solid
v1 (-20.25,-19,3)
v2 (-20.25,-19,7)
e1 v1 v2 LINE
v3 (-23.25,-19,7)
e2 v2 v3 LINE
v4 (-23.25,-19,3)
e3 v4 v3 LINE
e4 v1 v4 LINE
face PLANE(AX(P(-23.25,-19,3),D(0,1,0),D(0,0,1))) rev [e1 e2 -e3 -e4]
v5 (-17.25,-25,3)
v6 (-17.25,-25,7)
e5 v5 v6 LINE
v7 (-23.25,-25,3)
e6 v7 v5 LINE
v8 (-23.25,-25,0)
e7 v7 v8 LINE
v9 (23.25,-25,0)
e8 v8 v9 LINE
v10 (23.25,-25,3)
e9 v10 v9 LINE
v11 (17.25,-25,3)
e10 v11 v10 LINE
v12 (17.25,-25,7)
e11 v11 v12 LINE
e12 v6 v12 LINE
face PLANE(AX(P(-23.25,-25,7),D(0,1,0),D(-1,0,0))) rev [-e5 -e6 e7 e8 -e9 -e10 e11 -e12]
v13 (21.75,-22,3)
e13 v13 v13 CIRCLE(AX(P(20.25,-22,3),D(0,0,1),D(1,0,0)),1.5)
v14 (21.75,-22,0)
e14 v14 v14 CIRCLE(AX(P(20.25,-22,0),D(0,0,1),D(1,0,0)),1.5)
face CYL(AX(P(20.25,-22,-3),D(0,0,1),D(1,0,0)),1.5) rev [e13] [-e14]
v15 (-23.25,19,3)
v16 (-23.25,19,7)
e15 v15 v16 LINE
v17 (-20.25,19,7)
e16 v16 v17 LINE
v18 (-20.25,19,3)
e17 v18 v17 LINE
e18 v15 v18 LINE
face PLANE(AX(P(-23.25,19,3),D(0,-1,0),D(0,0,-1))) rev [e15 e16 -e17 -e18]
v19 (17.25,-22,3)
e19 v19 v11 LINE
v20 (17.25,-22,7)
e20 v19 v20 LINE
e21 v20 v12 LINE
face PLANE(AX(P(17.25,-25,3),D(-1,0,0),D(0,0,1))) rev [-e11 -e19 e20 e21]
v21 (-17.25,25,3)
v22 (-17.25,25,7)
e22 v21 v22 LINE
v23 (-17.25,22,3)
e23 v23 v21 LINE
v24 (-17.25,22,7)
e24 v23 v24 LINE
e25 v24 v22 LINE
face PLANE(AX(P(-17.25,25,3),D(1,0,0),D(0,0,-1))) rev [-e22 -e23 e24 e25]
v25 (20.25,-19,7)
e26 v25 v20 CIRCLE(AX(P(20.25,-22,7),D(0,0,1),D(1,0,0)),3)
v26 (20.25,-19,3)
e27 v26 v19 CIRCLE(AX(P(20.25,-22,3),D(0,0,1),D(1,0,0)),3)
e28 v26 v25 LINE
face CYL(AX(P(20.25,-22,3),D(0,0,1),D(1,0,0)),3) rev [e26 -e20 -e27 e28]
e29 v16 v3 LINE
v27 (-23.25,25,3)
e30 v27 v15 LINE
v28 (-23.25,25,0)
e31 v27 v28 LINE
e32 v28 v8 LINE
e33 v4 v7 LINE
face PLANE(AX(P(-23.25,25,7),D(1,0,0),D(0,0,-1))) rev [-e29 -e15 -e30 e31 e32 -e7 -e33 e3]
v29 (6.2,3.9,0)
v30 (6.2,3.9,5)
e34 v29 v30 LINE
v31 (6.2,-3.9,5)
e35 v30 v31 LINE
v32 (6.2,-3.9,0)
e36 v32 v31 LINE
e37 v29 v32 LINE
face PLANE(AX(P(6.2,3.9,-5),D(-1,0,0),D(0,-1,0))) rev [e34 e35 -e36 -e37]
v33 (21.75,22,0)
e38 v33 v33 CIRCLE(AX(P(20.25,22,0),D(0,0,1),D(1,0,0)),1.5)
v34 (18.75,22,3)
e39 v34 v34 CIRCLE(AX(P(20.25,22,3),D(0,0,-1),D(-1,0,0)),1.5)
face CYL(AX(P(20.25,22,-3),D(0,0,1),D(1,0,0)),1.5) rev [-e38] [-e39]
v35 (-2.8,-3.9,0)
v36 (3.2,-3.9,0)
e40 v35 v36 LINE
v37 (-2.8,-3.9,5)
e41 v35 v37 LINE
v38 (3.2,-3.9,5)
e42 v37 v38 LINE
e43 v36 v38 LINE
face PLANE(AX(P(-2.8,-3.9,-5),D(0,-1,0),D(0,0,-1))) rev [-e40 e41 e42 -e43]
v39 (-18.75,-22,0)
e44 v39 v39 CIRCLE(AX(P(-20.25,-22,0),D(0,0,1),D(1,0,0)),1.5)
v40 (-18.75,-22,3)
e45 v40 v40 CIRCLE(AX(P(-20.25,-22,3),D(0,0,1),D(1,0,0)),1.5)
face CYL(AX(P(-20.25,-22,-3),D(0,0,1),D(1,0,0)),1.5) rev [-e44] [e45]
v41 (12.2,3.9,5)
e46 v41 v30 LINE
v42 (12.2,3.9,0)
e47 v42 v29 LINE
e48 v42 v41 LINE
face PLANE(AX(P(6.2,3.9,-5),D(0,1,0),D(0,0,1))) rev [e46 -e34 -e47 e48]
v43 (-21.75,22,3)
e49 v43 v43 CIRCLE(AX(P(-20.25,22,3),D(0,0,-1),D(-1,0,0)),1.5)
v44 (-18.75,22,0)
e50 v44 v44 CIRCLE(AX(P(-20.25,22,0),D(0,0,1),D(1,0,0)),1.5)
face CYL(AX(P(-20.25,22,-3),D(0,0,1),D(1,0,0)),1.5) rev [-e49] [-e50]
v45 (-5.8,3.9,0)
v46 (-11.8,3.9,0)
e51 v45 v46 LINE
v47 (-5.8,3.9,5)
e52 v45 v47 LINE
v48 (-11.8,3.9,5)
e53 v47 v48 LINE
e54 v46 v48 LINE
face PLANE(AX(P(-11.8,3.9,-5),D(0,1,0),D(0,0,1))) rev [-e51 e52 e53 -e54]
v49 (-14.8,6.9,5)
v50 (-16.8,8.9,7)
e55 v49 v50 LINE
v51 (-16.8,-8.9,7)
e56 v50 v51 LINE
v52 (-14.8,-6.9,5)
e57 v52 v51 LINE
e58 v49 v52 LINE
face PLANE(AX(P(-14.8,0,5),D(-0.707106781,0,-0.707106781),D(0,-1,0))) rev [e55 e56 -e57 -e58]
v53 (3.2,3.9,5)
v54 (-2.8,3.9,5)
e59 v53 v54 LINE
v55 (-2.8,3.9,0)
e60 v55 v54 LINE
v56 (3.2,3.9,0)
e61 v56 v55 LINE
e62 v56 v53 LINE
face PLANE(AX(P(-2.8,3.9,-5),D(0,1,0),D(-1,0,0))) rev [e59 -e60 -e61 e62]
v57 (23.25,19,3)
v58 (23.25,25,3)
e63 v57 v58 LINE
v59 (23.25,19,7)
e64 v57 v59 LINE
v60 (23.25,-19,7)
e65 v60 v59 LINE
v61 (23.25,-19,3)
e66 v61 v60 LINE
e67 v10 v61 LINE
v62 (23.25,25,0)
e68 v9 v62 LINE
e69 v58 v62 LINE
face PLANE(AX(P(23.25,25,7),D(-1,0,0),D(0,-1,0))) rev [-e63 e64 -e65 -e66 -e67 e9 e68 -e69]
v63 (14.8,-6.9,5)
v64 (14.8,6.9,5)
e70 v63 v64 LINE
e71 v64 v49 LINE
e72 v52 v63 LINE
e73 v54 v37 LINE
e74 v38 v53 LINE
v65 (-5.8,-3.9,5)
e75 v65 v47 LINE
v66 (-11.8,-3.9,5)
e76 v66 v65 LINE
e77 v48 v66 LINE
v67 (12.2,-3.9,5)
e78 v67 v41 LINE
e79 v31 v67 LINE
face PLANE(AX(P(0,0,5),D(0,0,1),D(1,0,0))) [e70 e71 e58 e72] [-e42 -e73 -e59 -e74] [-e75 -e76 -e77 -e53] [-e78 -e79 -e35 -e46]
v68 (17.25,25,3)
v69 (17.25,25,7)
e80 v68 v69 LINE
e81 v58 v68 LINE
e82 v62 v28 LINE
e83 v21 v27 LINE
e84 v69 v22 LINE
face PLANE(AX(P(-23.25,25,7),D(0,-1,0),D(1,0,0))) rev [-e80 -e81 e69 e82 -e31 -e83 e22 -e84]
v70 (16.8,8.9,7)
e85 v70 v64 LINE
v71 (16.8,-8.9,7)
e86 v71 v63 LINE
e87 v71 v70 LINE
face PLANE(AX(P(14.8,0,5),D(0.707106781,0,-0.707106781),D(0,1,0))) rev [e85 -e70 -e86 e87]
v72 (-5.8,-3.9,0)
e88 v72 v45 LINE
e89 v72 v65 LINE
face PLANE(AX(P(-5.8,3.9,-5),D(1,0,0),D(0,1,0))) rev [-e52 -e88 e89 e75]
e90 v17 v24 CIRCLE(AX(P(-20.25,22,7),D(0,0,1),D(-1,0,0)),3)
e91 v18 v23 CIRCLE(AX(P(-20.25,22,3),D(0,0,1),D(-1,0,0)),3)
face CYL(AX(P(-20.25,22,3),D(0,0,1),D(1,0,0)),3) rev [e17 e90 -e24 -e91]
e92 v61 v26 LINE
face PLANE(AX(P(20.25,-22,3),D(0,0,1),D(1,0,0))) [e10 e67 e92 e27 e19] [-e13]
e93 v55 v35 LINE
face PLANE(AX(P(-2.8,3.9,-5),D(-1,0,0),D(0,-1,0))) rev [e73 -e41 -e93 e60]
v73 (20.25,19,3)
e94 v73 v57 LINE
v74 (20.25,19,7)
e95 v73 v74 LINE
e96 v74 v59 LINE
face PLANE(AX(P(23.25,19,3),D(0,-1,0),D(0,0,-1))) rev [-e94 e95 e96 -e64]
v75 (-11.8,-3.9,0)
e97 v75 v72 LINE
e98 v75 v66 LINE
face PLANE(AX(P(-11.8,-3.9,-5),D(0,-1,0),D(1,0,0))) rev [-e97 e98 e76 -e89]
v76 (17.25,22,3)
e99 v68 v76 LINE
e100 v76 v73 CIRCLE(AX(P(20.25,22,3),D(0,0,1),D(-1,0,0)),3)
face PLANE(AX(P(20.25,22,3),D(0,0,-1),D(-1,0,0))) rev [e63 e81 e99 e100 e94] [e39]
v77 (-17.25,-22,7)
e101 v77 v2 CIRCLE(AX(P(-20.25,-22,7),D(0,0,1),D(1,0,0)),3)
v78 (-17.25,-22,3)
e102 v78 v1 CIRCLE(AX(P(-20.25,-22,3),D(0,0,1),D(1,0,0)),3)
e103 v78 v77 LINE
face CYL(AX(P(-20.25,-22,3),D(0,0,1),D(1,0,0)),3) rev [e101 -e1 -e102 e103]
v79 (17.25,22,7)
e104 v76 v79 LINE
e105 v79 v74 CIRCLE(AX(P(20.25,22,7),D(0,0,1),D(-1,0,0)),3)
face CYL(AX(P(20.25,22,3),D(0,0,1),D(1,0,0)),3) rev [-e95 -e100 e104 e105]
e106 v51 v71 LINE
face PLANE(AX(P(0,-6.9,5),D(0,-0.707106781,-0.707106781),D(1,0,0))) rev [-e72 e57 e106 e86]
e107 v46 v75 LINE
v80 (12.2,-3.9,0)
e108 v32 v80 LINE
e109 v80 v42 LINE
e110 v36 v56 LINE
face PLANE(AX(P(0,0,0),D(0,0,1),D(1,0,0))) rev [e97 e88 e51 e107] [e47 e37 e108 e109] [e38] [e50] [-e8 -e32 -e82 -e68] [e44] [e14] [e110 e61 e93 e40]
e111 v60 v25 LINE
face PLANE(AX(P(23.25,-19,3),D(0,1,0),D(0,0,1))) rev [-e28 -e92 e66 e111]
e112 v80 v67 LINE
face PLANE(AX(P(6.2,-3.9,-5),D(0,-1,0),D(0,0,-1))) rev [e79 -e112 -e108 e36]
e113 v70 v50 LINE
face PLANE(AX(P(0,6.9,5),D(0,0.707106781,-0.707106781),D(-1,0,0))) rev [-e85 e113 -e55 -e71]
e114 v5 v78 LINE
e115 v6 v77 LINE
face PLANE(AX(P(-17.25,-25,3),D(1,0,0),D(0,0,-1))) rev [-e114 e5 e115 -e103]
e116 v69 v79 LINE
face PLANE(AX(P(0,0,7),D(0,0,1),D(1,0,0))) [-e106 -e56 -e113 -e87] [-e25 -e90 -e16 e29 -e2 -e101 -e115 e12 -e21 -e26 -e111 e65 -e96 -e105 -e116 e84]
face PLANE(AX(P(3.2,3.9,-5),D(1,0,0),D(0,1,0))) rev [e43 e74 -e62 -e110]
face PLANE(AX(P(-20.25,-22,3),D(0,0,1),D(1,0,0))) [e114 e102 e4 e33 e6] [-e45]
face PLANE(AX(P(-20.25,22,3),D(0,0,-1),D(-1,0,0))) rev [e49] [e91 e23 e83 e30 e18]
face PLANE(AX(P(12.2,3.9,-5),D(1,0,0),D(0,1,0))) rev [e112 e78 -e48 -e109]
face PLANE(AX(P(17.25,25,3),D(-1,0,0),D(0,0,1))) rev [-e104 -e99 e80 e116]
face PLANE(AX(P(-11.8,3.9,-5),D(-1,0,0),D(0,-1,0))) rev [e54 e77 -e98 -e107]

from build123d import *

# Parameters (mm, degrees)
SKETCH1_W           = 46.5
SKETCH1_H           = 50
BOSS_EXTRUDE1_DEPTH = 7
SKETCH2_W           = 33.6
SKETCH2_H           = 17.8
CUT_EXTRUDE1_DEPTH  = 2
CHAMFER1_SIZE       = 2
CUT_EXTRUDE2_DEPTH  = 4
SKETCH4_R           = 1.5
CUT_EXTRUDE3_DEPTH  = 10
SKETCH5_W           = 6
SKETCH5_H           = 7.8
CUT_EXTRUDE4_DEPTH  = 10


with BuildPart() as part:
    # Sketch1 → Boss-Extrude1 (new body)
    with BuildSketch(Plane.XY):
        Rectangle(SKETCH1_W, SKETCH1_H)
    extrude(amount=BOSS_EXTRUDE1_DEPTH)

    # Sketch2 → Cut-Extrude1 (cut)
    with BuildSketch(Plane.XY.offset(7)):
        Rectangle(SKETCH2_W, SKETCH2_H)
    extrude(amount=-CUT_EXTRUDE1_DEPTH, mode=Mode.SUBTRACT)

    # Chamfer1
    chamfer1_edges = [part.edges().sort_by_distance(p)[0] for p in [
        (0, -8.9, 5),
        (16.8, 0, 5),
        (0, 8.9, 5),
        (-16.8, 0, 5),
    ]]
    chamfer(chamfer1_edges, length=CHAMFER1_SIZE - 0.0001)  # a hair under: the kernel refuses the full size

    # Sketch3 → Cut-Extrude2 (cut)
    with BuildSketch(Plane.XY.offset(7)):
        with BuildLine():
            Line((23.25, -25), (17.25, -25))
            Line((17.25, -25), (17.25, -22))
            ThreePointArc((17.25, -22), (18.128679656, -19.878679656), (20.25, -19))
            Line((20.25, -19), (23.25, -19))
            Line((23.25, -19), (23.25, -25))
        make_face()
        with BuildLine():
            Line((-23.25, -25), (-17.25, -25))
            Line((-17.25, -25), (-17.25, -22))
            ThreePointArc((-17.25, -22), (-18.128679656, -19.878679656), (-20.25, -19))
            Line((-20.25, -19), (-23.25, -19))
            Line((-23.25, -19), (-23.25, -25))
        make_face()
        with BuildLine():
            Line((-17.25, 25), (-17.25, 22))
            ThreePointArc((-17.25, 22), (-18.128679656, 19.878679656), (-20.25, 19))
            Line((-20.25, 19), (-23.25, 19))
            Line((-23.25, 19), (-23.25, 25))
            Line((-23.25, 25), (-17.25, 25))
        make_face()
        with BuildLine():
            Line((17.25, 25), (17.25, 22))
            ThreePointArc((17.25, 22), (18.128679656, 19.878679656), (20.25, 19))
            Line((20.25, 19), (23.25, 19))
            Line((23.25, 19), (23.25, 25))
            Line((23.25, 25), (17.25, 25))
        make_face()
    extrude(amount=-CUT_EXTRUDE2_DEPTH, mode=Mode.SUBTRACT)

    # Sketch4 → Cut-Extrude3 (cut)
    with BuildSketch(Plane.XY.offset(7)):
        with Locations((-20.25, 22)):
            Circle(SKETCH4_R)
        with Locations((20.25, 22)):
            Circle(SKETCH4_R)
        with Locations((20.25, -22)):
            Circle(SKETCH4_R)
        with Locations((-20.25, -22)):
            Circle(SKETCH4_R)
    extrude(amount=-CUT_EXTRUDE3_DEPTH, mode=Mode.SUBTRACT)

    # Sketch5 → Cut-Extrude4 (cut)
    with BuildSketch(Plane.XY.offset(5)):
        with Locations((-8.8, 0)):
            Rectangle(SKETCH5_W, SKETCH5_H)
        with Locations((0.2, 0)):
            Rectangle(SKETCH5_W, SKETCH5_H)
        with Locations((9.2, 0)):
            Rectangle(SKETCH5_W, SKETCH5_H)
    extrude(amount=-CUT_EXTRUDE4_DEPTH, mode=Mode.SUBTRACT)


solid = part.part
